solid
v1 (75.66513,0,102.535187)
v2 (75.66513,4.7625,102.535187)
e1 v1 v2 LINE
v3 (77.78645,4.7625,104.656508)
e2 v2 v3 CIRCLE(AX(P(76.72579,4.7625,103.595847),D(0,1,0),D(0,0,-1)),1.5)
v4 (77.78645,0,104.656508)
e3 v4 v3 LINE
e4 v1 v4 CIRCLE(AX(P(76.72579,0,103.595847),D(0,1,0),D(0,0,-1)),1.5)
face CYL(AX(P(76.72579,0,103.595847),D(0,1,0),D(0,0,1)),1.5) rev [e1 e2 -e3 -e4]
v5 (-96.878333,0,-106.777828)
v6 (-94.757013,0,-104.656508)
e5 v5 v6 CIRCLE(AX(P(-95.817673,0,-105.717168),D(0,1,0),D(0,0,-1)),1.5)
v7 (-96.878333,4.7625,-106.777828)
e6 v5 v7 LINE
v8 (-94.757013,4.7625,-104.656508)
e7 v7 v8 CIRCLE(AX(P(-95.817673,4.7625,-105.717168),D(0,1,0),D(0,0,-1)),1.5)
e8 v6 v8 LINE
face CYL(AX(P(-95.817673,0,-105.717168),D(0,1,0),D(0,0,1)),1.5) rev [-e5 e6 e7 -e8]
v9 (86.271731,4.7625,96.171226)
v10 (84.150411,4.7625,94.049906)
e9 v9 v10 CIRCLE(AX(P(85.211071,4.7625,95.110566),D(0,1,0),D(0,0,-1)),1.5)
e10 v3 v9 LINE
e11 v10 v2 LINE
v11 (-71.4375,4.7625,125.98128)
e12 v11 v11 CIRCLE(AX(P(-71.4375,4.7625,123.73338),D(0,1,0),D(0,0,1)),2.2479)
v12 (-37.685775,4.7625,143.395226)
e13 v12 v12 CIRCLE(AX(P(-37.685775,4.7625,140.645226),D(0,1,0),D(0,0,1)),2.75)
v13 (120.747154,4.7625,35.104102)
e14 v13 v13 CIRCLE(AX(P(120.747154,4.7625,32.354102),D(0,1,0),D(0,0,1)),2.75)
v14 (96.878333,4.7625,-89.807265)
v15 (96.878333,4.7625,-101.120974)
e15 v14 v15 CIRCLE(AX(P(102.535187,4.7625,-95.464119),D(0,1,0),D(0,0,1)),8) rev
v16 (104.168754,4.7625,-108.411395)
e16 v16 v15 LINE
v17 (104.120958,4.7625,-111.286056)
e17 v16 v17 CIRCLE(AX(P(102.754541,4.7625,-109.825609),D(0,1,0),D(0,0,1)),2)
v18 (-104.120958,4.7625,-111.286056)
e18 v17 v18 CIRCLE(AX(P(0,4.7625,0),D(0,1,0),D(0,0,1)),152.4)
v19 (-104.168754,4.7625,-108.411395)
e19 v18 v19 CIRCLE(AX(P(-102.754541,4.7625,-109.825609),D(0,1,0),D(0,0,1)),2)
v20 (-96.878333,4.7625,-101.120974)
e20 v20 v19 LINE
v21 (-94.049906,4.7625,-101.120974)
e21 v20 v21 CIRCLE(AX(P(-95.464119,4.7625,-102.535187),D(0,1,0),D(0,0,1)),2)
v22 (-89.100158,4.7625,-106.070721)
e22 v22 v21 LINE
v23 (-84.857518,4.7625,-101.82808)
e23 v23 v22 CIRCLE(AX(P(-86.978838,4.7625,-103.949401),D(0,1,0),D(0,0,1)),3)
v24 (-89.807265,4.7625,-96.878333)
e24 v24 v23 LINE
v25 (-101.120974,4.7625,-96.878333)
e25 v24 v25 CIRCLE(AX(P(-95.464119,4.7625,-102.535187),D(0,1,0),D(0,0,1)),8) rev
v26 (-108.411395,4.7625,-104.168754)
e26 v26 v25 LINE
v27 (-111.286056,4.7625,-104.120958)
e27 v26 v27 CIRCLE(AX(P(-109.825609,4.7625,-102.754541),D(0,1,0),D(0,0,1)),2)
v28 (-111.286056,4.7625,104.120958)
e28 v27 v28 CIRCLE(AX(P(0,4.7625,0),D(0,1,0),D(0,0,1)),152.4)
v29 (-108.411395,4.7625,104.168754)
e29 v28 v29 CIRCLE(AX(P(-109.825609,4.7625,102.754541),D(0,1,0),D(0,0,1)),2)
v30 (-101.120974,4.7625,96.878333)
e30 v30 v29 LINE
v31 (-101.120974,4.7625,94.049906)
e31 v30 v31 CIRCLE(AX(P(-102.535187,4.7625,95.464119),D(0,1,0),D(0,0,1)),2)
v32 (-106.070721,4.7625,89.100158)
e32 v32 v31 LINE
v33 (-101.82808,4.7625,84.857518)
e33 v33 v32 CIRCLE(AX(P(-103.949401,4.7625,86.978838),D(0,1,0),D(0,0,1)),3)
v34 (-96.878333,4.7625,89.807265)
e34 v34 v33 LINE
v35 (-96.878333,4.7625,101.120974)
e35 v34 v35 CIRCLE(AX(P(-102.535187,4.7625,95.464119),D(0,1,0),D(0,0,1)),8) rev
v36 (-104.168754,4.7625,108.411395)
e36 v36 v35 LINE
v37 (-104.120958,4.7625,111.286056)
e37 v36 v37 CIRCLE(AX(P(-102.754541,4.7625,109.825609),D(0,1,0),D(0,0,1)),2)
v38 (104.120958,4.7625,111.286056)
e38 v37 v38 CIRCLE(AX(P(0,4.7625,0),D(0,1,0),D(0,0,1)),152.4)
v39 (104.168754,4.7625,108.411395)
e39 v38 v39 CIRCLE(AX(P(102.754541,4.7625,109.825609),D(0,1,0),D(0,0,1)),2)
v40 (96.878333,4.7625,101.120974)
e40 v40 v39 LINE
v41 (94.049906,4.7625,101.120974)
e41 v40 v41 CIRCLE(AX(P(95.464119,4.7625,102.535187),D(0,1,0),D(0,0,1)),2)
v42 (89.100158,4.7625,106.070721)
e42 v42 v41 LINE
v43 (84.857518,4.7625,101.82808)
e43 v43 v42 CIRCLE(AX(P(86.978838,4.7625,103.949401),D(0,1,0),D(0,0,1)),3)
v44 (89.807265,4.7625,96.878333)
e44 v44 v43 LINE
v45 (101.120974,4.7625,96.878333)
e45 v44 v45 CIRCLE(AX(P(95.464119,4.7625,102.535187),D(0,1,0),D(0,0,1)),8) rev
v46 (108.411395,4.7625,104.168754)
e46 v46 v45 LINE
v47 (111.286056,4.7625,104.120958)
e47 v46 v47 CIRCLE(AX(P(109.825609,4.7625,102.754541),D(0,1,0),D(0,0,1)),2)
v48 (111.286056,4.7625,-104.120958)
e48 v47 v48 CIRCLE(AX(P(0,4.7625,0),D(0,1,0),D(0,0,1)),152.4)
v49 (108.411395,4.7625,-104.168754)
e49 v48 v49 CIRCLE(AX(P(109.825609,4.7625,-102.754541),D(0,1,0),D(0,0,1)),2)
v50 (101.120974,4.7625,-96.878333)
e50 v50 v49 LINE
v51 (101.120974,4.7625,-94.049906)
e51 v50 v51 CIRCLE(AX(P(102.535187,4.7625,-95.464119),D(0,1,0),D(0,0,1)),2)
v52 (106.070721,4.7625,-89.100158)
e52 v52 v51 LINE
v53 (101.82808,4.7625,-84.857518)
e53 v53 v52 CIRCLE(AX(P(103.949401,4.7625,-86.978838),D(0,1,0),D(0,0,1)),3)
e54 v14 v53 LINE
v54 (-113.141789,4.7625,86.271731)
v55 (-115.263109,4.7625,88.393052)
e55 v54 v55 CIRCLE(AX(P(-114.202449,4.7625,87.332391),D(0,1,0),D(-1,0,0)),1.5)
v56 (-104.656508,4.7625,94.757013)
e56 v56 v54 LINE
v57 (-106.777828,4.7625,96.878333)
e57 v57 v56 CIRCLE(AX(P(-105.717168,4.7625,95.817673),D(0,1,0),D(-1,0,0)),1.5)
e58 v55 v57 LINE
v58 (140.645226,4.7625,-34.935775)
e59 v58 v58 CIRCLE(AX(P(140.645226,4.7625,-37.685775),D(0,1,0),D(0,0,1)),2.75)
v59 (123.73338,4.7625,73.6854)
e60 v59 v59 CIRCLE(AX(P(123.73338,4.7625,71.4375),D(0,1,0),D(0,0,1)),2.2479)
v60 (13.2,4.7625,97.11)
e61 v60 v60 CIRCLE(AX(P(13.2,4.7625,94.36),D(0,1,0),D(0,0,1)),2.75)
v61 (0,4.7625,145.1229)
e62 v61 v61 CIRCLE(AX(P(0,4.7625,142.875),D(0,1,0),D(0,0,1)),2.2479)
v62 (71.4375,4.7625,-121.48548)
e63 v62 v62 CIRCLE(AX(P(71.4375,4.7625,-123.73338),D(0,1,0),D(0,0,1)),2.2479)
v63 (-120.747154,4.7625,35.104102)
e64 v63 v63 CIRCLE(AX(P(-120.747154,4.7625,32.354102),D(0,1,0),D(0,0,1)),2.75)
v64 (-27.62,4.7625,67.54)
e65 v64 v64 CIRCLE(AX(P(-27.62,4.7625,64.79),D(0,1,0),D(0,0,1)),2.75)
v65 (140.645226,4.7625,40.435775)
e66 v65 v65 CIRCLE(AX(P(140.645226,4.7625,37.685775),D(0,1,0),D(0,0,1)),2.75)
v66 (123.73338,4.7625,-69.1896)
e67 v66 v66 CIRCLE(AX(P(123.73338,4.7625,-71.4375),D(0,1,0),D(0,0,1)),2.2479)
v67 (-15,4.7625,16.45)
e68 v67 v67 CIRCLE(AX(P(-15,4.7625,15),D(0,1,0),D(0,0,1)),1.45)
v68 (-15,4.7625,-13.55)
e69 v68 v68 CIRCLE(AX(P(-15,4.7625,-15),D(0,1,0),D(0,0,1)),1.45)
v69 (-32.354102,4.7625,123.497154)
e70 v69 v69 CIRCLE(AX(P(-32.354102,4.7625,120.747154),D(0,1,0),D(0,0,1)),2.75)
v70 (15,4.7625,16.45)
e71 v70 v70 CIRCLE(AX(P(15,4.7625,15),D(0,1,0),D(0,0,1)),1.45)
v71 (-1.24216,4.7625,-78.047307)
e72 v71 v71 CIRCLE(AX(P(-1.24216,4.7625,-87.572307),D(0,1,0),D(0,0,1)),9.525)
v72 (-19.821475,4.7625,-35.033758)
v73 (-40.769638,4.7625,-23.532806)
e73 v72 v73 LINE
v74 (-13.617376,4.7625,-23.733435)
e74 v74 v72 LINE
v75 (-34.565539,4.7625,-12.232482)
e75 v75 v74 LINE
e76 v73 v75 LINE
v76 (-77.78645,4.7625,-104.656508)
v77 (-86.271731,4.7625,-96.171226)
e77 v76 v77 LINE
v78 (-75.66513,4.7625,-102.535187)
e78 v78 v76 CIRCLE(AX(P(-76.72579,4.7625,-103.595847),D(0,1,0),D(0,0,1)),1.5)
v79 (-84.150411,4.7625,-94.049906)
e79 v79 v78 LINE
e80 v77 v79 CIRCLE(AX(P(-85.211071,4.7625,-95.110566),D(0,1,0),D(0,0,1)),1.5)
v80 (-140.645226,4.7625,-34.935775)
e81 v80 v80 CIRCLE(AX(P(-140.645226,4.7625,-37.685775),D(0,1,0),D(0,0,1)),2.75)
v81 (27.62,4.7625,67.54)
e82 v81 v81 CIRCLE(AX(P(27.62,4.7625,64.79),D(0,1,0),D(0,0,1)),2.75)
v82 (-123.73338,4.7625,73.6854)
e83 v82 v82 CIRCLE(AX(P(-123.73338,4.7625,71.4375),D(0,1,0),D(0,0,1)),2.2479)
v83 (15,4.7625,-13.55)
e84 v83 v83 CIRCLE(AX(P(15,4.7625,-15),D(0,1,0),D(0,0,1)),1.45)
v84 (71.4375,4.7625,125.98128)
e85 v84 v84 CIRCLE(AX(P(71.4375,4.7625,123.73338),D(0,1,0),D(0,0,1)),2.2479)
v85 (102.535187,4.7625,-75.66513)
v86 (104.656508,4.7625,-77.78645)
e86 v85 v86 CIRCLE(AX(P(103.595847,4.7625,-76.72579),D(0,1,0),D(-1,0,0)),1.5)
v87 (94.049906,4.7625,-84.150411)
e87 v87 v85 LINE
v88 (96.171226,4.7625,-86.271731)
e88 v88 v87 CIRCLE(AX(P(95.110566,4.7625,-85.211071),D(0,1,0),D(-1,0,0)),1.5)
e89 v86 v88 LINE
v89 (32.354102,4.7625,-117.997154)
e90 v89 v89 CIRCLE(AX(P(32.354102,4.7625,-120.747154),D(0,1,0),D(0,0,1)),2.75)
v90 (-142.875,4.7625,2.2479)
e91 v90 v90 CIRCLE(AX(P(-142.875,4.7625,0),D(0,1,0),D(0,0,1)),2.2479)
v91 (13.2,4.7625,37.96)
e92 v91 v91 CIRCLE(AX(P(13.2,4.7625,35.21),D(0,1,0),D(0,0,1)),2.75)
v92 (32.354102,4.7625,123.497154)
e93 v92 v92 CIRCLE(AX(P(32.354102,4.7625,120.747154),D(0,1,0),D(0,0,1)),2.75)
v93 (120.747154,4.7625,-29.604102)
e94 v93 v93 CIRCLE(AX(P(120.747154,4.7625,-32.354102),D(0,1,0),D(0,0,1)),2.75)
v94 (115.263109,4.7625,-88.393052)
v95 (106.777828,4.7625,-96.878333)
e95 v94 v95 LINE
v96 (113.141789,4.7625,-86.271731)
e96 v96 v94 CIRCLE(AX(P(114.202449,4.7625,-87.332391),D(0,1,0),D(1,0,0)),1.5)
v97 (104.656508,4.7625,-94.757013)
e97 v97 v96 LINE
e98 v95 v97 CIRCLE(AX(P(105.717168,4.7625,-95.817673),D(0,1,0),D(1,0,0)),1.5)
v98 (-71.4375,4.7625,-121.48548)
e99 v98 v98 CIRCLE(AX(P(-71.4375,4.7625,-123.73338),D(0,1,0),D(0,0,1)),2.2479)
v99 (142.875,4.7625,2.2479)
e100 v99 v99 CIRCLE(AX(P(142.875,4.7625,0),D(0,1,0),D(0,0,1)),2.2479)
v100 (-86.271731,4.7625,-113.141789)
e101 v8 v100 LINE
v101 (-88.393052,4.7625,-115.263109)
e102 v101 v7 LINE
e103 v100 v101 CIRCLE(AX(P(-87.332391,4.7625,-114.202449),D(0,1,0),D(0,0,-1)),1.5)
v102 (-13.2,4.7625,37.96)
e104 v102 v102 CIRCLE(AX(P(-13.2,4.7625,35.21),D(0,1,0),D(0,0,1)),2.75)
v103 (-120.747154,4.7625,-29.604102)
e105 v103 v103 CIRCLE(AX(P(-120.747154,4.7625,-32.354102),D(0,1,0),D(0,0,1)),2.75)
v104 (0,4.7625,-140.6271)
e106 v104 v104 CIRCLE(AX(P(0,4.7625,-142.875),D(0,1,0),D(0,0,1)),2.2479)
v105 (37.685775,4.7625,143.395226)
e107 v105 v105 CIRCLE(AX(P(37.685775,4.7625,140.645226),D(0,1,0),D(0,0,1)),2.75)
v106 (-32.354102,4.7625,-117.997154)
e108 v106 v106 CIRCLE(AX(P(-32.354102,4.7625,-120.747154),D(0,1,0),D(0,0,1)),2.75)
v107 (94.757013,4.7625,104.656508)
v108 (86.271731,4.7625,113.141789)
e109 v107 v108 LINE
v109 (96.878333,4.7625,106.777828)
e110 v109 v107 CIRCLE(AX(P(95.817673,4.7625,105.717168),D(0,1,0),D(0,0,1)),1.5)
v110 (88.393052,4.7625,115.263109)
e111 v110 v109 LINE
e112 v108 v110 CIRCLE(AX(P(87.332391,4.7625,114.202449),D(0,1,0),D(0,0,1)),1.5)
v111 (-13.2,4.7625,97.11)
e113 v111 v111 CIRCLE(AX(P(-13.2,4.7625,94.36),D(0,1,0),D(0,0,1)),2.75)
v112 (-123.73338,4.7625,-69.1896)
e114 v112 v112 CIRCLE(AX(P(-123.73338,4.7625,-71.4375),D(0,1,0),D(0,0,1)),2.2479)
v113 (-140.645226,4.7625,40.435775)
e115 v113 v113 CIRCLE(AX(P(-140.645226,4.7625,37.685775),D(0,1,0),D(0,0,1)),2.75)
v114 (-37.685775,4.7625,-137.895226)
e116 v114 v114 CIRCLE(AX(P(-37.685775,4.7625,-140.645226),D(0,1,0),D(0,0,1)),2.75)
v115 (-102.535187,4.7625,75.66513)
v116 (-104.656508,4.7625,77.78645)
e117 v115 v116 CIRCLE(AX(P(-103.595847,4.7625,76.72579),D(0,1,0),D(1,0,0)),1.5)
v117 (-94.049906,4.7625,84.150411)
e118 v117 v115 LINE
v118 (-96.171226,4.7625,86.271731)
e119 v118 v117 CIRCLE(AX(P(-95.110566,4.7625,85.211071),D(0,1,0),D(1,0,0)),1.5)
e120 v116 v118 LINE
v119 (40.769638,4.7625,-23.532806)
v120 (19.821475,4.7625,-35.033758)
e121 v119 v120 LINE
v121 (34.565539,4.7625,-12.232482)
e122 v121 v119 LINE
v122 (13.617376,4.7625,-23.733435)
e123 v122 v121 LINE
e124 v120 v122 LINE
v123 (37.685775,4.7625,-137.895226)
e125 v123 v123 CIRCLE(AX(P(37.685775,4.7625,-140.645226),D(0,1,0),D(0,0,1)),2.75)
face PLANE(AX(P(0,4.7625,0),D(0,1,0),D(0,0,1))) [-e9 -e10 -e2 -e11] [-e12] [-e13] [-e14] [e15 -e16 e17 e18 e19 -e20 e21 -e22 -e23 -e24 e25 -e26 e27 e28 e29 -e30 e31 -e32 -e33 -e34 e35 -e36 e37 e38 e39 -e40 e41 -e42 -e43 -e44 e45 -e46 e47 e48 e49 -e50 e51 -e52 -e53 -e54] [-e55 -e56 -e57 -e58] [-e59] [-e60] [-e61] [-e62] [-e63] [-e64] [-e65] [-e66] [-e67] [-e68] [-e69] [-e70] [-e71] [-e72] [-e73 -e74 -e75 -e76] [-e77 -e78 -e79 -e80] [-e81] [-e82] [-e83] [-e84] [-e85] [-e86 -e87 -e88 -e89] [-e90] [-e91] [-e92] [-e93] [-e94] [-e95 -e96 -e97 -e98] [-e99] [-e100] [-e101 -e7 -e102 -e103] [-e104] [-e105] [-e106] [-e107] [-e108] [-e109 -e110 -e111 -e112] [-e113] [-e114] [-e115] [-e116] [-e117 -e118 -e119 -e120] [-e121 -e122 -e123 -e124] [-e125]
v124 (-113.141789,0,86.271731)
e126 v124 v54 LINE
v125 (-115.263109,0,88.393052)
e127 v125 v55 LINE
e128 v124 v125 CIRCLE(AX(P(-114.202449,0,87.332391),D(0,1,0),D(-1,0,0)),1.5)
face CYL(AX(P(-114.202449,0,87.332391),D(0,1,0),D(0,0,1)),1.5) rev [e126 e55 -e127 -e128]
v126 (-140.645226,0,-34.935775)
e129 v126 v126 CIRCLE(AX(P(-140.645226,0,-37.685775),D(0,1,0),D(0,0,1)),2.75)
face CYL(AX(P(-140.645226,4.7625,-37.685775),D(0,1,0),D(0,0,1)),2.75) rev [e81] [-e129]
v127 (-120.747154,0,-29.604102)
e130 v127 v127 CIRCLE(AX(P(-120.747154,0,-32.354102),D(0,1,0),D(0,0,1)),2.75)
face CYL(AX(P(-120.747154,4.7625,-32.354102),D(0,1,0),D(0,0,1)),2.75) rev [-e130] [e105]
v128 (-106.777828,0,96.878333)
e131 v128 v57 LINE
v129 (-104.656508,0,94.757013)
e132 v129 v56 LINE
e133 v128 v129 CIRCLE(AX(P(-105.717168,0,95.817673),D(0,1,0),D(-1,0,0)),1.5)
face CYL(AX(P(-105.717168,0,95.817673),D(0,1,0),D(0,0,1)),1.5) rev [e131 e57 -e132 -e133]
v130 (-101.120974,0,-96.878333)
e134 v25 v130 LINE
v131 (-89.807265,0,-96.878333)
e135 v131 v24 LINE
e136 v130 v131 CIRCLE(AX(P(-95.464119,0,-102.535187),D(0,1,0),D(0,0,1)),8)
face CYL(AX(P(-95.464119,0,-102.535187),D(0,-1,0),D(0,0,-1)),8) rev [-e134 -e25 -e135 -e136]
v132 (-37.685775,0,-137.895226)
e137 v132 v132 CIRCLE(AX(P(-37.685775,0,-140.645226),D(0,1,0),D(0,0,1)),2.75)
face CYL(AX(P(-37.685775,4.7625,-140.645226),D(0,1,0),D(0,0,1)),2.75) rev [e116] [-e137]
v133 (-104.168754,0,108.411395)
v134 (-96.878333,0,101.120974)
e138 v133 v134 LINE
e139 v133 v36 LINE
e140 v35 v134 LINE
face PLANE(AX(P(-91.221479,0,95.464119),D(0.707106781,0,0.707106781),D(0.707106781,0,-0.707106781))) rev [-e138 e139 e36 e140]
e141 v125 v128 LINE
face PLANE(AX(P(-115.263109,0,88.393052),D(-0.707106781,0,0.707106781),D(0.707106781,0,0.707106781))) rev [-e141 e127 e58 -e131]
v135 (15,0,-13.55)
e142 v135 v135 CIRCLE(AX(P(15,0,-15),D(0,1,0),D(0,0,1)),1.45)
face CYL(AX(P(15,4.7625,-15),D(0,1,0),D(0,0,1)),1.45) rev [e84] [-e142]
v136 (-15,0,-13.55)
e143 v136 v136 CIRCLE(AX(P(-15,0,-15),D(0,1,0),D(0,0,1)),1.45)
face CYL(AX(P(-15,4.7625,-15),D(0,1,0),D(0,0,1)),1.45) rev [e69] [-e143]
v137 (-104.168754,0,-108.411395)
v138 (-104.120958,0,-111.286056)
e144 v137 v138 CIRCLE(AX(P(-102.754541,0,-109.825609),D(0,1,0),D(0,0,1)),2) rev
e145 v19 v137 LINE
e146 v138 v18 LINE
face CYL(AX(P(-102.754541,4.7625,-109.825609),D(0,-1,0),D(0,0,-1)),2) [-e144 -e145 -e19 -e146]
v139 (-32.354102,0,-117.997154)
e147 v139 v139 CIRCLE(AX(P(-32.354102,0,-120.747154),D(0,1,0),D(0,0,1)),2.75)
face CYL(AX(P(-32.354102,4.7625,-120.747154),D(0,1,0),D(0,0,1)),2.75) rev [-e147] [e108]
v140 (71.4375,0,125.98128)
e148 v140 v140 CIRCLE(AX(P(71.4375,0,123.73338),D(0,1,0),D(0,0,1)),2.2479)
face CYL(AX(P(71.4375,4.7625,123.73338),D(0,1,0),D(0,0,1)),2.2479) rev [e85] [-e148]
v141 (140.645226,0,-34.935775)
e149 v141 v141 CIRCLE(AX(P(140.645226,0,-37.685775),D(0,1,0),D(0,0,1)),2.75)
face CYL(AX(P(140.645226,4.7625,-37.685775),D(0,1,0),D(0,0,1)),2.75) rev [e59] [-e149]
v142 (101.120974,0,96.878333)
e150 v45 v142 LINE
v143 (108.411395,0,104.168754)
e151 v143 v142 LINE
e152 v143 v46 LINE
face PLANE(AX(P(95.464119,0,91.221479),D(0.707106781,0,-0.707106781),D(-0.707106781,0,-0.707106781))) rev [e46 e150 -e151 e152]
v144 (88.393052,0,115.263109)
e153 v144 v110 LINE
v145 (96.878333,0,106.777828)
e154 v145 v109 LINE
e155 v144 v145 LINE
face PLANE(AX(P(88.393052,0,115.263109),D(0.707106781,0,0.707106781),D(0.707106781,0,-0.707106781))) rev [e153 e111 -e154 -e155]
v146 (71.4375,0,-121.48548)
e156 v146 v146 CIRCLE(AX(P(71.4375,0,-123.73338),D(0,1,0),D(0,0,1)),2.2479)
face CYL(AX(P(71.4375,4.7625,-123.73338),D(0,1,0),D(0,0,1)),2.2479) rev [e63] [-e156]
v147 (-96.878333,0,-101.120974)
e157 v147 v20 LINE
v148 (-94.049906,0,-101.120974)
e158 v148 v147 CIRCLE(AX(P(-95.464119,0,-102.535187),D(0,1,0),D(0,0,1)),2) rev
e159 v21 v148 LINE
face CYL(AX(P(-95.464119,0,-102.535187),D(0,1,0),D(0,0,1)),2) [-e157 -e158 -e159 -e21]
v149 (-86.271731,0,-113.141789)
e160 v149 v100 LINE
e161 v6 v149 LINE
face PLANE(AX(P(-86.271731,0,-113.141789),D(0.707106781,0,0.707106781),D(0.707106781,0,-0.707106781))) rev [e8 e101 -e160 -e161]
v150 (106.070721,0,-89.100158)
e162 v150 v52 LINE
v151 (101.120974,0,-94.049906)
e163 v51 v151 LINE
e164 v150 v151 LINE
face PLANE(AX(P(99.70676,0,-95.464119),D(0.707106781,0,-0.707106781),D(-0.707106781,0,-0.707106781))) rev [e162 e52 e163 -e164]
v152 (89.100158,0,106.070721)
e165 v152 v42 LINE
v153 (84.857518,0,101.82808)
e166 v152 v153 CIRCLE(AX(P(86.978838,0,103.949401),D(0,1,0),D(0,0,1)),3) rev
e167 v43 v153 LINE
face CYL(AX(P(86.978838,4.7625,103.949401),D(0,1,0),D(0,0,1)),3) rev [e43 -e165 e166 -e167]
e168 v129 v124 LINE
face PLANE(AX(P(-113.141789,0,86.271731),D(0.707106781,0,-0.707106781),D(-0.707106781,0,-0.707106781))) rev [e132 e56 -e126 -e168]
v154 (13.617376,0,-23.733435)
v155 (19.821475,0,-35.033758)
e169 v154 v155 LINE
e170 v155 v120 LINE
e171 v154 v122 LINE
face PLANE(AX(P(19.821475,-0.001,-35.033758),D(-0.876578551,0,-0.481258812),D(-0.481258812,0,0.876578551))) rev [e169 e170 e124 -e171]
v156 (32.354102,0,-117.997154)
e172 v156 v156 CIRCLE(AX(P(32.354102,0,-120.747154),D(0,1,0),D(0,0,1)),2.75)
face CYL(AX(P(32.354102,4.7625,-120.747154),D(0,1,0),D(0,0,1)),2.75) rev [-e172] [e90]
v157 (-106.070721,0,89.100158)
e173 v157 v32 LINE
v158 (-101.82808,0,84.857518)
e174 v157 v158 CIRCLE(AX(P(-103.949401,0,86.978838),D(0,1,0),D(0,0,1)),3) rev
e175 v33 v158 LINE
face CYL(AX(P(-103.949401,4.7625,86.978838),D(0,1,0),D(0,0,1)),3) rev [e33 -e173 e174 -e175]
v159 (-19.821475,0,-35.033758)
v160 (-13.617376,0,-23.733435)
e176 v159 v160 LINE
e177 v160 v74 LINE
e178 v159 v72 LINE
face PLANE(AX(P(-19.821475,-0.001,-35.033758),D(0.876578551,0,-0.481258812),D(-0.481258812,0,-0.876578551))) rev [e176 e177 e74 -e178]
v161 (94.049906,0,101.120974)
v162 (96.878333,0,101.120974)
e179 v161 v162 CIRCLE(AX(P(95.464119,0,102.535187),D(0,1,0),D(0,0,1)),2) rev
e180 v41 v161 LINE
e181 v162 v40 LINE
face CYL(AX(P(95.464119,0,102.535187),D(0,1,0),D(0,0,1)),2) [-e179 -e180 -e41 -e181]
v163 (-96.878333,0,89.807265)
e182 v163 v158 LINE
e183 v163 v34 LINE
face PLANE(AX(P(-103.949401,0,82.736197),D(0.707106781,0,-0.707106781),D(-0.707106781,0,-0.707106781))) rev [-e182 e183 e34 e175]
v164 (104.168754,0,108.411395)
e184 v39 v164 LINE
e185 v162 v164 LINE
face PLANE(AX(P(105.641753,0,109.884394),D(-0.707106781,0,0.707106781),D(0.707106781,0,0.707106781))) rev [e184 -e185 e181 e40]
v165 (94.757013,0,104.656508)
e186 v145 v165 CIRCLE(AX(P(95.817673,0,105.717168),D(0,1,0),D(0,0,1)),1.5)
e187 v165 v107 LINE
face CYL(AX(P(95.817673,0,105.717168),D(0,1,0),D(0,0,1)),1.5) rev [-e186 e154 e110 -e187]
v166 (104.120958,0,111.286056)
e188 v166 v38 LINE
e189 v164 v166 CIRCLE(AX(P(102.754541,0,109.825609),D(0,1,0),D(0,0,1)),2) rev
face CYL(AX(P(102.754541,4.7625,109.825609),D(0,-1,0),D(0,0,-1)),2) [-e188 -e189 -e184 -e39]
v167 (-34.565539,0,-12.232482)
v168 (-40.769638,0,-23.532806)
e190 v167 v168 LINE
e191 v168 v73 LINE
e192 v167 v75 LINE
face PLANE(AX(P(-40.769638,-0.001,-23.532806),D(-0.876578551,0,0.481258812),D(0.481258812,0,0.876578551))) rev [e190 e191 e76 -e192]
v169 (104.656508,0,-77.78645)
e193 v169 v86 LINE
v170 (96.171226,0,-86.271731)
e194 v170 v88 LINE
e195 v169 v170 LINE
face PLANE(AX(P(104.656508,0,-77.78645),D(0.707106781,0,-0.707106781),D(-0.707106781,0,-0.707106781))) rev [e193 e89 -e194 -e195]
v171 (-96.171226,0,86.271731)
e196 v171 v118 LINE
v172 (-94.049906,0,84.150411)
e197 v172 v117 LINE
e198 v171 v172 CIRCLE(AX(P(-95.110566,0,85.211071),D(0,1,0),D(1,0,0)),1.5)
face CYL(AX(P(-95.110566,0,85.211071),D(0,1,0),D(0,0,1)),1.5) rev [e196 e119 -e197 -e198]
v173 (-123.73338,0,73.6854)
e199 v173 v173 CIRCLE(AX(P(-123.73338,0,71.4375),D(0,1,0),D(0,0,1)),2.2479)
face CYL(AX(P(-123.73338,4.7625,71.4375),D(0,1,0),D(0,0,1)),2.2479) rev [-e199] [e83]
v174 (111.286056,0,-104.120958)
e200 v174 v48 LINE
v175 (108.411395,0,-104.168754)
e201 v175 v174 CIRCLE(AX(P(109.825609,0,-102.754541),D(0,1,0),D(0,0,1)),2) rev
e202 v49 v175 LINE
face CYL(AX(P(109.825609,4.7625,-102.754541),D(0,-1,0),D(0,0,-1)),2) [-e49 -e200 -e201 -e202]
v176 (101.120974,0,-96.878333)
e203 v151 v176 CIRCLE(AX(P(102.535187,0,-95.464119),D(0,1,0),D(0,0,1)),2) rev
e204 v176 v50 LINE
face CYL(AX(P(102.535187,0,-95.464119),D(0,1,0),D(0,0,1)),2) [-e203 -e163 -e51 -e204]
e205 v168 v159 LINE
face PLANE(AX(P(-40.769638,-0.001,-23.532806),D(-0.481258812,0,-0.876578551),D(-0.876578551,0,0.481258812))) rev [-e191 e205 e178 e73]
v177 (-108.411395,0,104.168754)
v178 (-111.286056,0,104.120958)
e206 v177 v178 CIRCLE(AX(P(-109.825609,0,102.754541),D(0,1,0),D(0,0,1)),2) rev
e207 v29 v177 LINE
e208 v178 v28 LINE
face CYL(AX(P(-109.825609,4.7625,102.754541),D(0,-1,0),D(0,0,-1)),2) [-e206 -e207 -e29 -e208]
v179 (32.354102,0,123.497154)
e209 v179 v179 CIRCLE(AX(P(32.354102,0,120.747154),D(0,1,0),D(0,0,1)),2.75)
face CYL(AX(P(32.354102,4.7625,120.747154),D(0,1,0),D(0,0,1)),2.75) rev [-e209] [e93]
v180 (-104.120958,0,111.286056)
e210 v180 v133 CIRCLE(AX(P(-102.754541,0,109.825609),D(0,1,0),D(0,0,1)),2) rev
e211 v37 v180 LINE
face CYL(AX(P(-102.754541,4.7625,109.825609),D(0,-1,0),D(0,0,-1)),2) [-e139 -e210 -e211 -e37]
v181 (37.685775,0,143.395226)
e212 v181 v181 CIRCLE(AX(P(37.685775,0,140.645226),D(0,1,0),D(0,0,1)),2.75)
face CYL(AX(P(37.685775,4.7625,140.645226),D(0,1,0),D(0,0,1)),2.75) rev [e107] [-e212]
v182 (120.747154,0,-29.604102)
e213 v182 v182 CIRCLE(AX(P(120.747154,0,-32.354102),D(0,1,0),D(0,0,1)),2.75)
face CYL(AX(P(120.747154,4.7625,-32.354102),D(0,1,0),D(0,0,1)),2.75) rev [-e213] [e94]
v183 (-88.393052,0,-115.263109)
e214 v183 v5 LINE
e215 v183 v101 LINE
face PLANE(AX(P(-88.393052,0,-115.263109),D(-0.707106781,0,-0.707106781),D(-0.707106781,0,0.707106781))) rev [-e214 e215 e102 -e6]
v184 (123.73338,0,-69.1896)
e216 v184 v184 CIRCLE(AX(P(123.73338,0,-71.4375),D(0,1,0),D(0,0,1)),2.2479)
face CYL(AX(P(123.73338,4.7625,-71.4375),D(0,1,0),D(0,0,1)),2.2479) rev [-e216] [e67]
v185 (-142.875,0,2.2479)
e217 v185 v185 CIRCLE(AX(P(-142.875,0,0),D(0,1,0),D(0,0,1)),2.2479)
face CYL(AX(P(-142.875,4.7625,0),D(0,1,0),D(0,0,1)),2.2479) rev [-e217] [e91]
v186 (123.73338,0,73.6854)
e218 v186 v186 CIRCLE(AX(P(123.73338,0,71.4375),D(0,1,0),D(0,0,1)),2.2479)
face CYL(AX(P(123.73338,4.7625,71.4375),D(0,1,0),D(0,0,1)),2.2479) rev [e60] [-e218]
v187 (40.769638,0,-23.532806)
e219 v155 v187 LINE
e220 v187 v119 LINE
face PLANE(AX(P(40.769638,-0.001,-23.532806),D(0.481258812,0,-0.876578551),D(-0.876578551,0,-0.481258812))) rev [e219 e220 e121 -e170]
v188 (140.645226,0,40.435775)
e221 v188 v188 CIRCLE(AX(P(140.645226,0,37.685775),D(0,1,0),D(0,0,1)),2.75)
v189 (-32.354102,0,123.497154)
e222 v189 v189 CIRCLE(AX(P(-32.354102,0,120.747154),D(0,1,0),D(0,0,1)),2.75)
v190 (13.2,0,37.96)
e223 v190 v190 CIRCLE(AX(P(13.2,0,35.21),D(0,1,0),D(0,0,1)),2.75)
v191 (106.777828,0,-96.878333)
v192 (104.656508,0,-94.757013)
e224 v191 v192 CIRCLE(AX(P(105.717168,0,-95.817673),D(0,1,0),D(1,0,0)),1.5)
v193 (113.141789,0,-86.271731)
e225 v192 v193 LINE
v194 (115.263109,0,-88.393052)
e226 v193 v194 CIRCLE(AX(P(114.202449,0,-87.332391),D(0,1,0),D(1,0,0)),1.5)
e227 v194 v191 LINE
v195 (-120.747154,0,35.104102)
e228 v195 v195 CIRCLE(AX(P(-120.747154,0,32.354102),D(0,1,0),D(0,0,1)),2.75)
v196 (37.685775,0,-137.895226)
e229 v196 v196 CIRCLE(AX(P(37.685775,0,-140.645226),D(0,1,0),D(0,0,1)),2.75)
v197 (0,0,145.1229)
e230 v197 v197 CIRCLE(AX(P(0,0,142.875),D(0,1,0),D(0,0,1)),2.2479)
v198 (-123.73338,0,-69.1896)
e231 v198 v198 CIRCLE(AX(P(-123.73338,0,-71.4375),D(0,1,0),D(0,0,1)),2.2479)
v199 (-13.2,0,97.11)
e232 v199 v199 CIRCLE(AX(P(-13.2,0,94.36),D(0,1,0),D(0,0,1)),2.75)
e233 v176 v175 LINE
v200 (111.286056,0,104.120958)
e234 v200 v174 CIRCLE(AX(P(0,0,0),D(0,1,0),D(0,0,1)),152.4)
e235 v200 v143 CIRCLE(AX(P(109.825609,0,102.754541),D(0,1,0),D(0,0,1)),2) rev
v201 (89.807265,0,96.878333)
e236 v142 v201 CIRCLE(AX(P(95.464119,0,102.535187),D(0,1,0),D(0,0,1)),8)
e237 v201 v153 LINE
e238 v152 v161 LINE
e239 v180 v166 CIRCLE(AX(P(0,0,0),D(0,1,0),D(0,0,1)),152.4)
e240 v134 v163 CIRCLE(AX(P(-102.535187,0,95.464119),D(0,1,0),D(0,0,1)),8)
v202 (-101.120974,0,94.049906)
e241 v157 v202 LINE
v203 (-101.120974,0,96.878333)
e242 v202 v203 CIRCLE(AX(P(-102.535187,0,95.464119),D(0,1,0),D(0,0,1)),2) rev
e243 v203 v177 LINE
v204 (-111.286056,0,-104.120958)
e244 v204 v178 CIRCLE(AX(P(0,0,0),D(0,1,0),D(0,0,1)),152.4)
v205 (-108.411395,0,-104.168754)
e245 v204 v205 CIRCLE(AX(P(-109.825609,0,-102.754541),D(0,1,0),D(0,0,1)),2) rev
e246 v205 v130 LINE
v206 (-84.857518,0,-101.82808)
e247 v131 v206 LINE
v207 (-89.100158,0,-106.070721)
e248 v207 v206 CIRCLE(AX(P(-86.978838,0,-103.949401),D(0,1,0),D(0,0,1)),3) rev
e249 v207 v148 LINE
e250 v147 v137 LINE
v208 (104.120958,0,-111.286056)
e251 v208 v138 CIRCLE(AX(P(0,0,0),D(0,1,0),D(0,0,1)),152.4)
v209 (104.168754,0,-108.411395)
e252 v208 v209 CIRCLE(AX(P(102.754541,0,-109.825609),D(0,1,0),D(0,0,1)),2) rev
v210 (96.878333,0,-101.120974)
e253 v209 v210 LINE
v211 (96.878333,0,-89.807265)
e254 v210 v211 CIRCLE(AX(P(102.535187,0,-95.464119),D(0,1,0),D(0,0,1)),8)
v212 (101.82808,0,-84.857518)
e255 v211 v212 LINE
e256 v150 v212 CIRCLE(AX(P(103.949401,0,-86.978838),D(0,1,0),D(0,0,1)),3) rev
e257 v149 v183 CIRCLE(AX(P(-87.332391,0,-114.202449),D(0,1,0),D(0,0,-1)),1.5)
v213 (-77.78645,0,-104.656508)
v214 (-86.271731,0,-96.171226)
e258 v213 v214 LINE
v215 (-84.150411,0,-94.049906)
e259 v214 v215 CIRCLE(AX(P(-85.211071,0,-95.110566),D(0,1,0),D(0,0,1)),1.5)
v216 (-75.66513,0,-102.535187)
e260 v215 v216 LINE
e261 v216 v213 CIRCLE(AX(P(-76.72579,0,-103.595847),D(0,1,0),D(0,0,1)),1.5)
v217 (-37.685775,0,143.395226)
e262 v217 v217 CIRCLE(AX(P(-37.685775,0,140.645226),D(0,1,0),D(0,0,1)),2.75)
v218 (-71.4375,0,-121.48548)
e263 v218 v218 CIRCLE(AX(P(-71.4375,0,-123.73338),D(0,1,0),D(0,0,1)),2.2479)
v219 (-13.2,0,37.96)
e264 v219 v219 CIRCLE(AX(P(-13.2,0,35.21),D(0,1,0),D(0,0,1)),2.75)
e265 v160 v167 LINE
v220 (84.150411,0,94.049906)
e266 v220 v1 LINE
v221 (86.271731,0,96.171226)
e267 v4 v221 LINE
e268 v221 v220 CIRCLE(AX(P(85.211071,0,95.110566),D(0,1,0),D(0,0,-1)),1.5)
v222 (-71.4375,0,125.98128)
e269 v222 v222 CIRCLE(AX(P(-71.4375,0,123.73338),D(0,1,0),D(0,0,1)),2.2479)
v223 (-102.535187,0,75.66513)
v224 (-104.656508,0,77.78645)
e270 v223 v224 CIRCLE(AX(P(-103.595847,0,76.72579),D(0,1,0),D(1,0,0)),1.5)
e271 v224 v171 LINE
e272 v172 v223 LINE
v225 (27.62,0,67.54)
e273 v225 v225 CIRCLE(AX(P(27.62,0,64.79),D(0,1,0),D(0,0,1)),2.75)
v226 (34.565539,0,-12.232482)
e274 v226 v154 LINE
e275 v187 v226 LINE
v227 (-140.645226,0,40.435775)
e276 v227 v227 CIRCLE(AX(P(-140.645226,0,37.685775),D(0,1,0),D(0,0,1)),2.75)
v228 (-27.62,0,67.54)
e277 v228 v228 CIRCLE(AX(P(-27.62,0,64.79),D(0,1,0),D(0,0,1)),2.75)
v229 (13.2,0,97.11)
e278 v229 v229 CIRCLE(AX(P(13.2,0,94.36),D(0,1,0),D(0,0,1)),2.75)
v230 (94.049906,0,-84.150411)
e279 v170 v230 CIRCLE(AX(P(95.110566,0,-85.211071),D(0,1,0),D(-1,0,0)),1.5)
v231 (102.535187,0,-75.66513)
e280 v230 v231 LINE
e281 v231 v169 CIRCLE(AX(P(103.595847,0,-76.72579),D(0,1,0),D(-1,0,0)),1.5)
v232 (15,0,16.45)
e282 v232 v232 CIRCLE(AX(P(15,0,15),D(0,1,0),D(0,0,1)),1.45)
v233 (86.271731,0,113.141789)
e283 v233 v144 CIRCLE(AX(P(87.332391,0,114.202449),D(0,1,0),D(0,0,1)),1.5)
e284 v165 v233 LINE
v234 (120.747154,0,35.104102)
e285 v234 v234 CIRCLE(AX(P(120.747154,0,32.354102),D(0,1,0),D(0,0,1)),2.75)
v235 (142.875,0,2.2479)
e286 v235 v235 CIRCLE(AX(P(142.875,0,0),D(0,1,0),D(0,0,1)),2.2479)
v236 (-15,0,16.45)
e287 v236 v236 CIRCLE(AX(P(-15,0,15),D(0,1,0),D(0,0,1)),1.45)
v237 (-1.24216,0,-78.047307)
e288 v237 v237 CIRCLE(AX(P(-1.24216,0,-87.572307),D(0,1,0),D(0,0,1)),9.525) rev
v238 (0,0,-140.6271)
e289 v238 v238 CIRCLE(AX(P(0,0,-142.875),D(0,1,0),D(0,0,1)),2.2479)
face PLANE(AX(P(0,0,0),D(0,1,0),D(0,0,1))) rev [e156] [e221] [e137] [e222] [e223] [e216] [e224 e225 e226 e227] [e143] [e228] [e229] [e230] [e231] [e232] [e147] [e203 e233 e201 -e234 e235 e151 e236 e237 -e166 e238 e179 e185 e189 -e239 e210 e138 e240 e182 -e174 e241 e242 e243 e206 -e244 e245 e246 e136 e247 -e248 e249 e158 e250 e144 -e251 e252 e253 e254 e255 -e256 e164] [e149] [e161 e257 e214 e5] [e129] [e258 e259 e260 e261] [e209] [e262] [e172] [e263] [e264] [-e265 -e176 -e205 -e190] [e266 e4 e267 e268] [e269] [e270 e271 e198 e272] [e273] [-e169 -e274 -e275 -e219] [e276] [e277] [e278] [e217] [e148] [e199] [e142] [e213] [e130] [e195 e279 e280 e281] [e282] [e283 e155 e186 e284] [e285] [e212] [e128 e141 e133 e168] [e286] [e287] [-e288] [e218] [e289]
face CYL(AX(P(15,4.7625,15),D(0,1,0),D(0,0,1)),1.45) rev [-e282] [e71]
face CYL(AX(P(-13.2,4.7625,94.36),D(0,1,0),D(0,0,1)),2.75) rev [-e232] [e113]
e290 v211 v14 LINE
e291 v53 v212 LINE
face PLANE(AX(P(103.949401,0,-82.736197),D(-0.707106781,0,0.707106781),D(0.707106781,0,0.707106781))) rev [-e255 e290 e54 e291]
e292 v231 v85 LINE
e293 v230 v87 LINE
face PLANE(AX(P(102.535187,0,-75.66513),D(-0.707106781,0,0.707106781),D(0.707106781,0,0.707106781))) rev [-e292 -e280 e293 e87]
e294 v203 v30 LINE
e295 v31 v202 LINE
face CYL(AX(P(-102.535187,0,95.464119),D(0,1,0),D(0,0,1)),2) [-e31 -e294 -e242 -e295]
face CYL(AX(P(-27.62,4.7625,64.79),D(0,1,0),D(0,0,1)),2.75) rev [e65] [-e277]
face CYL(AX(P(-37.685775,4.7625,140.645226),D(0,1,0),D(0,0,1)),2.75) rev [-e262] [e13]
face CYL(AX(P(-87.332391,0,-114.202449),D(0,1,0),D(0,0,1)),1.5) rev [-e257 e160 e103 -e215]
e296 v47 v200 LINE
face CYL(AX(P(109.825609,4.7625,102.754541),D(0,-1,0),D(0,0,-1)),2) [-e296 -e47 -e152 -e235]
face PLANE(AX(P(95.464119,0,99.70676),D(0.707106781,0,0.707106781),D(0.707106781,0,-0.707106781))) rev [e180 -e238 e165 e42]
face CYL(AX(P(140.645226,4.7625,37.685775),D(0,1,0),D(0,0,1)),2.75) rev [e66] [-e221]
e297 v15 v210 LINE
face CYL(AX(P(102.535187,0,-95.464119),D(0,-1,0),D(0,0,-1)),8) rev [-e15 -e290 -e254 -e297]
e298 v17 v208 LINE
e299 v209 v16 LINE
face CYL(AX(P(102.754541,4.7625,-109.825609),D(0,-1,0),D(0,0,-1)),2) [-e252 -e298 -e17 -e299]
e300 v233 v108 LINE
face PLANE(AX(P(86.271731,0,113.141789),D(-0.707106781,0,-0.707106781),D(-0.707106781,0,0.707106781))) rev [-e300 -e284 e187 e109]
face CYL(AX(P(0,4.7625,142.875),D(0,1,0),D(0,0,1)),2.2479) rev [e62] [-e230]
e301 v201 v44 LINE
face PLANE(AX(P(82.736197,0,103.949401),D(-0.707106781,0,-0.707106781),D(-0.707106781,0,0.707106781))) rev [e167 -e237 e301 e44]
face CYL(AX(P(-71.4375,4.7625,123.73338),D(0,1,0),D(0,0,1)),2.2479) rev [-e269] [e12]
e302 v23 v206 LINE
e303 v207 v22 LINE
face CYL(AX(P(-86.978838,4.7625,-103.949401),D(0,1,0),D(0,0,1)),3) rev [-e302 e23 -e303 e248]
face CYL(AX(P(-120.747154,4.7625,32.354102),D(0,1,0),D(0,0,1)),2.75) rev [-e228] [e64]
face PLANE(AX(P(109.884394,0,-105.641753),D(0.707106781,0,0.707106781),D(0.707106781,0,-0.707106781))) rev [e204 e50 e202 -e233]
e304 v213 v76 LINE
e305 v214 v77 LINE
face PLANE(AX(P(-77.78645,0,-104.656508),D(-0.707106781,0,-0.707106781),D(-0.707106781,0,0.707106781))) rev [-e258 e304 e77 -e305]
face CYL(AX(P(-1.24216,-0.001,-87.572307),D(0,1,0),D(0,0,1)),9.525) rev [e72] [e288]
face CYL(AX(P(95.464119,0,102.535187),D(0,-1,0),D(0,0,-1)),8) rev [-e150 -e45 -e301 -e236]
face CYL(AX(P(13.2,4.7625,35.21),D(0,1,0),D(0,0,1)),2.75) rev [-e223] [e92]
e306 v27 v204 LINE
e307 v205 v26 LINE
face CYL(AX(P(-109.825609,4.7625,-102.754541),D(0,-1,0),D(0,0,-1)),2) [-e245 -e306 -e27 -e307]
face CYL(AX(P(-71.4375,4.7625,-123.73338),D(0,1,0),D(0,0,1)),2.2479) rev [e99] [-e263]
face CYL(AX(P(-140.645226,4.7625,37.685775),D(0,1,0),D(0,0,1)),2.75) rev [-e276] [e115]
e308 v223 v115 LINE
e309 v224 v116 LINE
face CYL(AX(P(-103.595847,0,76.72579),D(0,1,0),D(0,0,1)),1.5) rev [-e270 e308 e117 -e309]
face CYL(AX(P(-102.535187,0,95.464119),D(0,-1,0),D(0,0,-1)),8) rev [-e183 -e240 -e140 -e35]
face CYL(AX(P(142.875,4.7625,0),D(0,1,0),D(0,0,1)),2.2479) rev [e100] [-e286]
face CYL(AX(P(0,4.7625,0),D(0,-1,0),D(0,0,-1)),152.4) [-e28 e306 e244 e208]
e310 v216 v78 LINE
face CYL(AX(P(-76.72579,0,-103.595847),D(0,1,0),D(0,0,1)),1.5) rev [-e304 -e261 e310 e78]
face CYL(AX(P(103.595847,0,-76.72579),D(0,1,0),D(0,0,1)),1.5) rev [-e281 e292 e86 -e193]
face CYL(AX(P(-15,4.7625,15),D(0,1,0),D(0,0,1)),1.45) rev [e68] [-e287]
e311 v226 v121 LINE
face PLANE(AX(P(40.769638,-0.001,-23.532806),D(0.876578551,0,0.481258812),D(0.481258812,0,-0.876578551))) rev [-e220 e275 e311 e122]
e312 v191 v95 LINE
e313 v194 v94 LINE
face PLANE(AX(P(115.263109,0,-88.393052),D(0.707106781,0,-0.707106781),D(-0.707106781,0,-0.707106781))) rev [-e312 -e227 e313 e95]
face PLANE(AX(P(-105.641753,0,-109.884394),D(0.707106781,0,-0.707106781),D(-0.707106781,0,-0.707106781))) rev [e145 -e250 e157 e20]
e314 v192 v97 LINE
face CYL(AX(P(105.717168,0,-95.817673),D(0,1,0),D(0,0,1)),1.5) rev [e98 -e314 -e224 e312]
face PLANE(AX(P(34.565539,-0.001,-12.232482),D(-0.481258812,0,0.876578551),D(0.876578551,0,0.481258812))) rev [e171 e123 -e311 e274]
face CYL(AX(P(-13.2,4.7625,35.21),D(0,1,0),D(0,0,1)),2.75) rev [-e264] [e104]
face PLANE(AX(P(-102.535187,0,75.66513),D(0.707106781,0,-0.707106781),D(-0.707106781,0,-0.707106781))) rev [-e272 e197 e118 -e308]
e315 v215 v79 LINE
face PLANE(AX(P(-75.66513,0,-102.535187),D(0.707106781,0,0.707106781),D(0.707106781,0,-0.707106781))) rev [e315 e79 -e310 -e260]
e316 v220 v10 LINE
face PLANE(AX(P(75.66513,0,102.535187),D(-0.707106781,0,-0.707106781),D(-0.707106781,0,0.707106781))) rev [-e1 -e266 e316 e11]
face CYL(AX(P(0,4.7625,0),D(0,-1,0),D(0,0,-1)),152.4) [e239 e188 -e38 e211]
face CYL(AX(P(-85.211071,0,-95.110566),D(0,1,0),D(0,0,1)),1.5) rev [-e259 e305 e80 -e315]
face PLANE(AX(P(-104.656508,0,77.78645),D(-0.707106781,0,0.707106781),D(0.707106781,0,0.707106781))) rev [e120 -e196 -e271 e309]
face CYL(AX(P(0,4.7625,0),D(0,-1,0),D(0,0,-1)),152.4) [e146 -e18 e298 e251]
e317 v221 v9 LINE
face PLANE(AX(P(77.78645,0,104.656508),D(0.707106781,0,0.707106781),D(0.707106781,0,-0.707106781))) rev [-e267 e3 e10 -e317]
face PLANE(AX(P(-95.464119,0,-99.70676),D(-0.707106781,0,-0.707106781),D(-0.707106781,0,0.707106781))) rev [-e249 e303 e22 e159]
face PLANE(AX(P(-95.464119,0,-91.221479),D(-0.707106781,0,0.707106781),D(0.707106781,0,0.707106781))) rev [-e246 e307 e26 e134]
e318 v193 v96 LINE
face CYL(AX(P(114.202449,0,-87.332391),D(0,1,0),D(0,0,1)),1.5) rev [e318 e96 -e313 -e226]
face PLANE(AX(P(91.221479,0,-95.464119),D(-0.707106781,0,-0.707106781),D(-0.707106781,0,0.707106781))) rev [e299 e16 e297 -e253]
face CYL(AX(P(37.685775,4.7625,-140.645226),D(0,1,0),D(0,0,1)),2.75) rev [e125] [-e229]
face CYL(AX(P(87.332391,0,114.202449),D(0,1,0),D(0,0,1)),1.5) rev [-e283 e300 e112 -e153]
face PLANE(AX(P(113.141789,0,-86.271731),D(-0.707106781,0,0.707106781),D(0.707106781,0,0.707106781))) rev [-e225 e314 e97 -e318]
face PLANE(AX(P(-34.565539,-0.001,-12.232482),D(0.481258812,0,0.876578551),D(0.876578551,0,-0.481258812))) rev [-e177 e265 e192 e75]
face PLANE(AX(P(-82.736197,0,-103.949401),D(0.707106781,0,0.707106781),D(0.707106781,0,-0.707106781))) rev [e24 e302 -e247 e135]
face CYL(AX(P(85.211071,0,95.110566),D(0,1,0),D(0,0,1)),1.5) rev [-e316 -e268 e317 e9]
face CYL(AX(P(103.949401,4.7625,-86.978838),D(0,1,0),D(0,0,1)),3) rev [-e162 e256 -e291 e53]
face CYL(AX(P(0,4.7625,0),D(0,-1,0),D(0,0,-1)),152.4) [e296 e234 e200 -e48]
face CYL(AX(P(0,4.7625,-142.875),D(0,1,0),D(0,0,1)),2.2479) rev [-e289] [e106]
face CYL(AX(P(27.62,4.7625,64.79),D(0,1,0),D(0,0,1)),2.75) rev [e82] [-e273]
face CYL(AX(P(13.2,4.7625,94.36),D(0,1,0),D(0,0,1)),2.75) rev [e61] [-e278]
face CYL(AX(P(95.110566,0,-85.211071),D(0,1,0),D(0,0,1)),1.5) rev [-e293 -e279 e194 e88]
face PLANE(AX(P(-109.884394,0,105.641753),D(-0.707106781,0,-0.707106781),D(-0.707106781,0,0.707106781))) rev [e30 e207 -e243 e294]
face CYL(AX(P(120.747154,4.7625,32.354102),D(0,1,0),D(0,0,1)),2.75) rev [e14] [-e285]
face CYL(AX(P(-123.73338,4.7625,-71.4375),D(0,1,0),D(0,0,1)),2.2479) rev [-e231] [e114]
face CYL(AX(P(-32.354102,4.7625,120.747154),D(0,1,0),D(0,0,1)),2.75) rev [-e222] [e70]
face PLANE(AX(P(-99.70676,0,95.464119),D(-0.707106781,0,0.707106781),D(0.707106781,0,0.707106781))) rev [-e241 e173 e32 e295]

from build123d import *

# Parameters (mm, degrees)
SKETCH1_R                = 152.4
BOSS_EXTRUDE1_DEPTH      = 4.7625
F_8_CLEARANCE_HOLE1_D    = 4.4958
CIRPATTERN1_COUNT        = 12
M2_5_CLEARANCE_HOLE1_D   = 2.9
CUT_EXTRUDE1_DEPTH       = 216.578759172
FILLET1_R                = 3
FILLET2_R                = 2
FILLET3_R                = 8
CIRPATTERN2_COUNT        = 4
FILLET1_OF_CIRPATTERN2_R = 3
FILLET2_OF_CIRPATTERN2_R = 2
FILLET3_OF_CIRPATTERN2_R = 8
M5_CLEARANCE_HOLE1_D     = 5.5
M5_CLEARANCE_HOLE2_D     = 5.5
CIRPATTERN3_COUNT        = 12
CUT_EXTRUDE3_REACH       = 217.579
SKETCH15_R               = 9.525
CUT_EXTRUDE4_REACH       = 217.579


with BuildPart() as part:
    # Sketch1 → Boss-Extrude1 (new body)
    with BuildSketch(Plane(origin=(0, 0, 0), x_dir=(1, 0, 0), z_dir=(0, 1, 0))):
        with Locations(Location((0, 0, 0), (0, 0, 90))):
            Circle(SKETCH1_R)
    extrude(amount=BOSS_EXTRUDE1_DEPTH)

    # #8 Clearance Hole1 (through all)
    with Locations(Plane(origin=(0, 4.7625, 0), x_dir=(1, 0, 0), z_dir=(0, 1, 0))):
        with Locations((0, -142.875)):
            f_8_clearance_hole1 = Hole(F_8_CLEARANCE_HOLE1_D / 2)

    # CirPattern1: #8 Clearance Hole1 ×12 about axis
    cirpattern1_axis = Axis((0, 0, 0), (0, 1, 0))
    for i in range(1, CIRPATTERN1_COUNT):
        add(f_8_clearance_hole1.rotate(cirpattern1_axis, i * 360 / CIRPATTERN1_COUNT), mode=Mode.SUBTRACT)

    # M2.5 Clearance Hole1 (through all)
    with Locations(Plane(origin=(0, 4.7625, 0), x_dir=(1, 0, 0), z_dir=(0, 1, 0))):
        with Locations((-15, -15), (-15, 15), (15, 15), (15, -15)):
            Hole(M2_5_CLEARANCE_HOLE1_D / 2)

    # Sketch8 → Cut-Extrude1 (cut, through all)
    with BuildSketch(Plane(origin=(0, 4.7625, 0), x_dir=(1, 0, 0), z_dir=(0, 1, 0))):
        Polygon((105.641753109, -109.884393796), (95.464119439, -99.706760126), (86.978838065, -108.192041501), (82.736197378, -103.949400814), (95.464119439, -91.221478752), (109.884393796, -105.641753109), align=None)
        with BuildLine():
            Line((86.271731284, -113.141788969), (94.757012658, -104.656507595))
            ThreePointArc((94.757012658, -104.656507595), (96.878333002, -104.656507595), (96.878333002, -106.777827938))
            Line((96.878333002, -106.777827938), (88.393051627, -115.263109313))
            ThreePointArc((88.393051627, -115.263109313), (86.271731284, -115.263109313), (86.271731284, -113.141788969))
        make_face()
        with BuildLine():
            Line((77.78644991, -104.656507595), (86.271731284, -96.17122622))
            ThreePointArc((86.271731284, -96.17122622), (86.271731284, -94.049905877), (84.15041094, -94.049905877))
            Line((84.15041094, -94.049905877), (75.665129566, -102.535187251))
            ThreePointArc((75.665129566, -102.535187251), (75.665129566, -104.656507595), (77.78644991, -104.656507595))
        make_face()
    cut_extrude1 = extrude(amount=-CUT_EXTRUDE1_DEPTH, mode=Mode.SUBTRACT)

    # Fillet1
    fillet1_edges = [part.edges().sort_by_distance(p)[0] for p in [
        (86.978838065, 2.38125, 108.192041501),
        (82.736197378, 2.38125, 103.949400814),
    ]]
    fillet(fillet1_edges, radius=FILLET1_R - 0.0001)  # a hair under: the kernel refuses the full size

    # Fillet2
    fillet2_edges = [part.edges().sort_by_distance(p)[0] for p in [
        (105.620871949, 2.38125, 109.863512636),
        (109.863512636, 2.38125, 105.620871949),
        (95.464119439, 2.38125, 99.706760126),
    ]]
    fillet(fillet2_edges, radius=FILLET2_R)

    # Fillet3
    fillet3_edges = [part.edges().sort_by_distance(p)[0] for p in [
        (95.464119439, 2.38125, 91.221478752),
    ]]
    fillet(fillet3_edges, radius=FILLET3_R)

    # CirPattern2: Cut-Extrude1 ×4 about axis
    cirpattern2_axis = Axis((0, 0, 0), (0, 1, 0))
    for i in range(1, CIRPATTERN2_COUNT):
        add(cut_extrude1.rotate(cirpattern2_axis, i * 360 / CIRPATTERN2_COUNT), mode=Mode.SUBTRACT)

    # Fillet1 of CirPattern2
    fillet1_of_cirpattern2_edges = [part.edges().sort_by_distance(p)[0] for p in [
        (108.192041501, 2.38125, -86.978838065),
        (103.949400814, 2.38125, -82.736197378),
        (-86.978838065, 2.38125, -108.192041501),
        (-82.736197378, 2.38125, -103.949400814),
        (-108.192041501, 2.38125, 86.978838065),
        (-103.949400814, 2.38125, 82.736197378),
    ]]
    fillet(fillet1_of_cirpattern2_edges, radius=FILLET1_OF_CIRPATTERN2_R - 0.0001)  # a hair under: the kernel refuses the full size

    # Fillet2 of CirPattern2
    fillet2_of_cirpattern2_edges = [part.edges().sort_by_distance(p)[0] for p in [
        (109.863512636, 2.38125, -105.620871949),
        (105.620871949, 2.38125, -109.863512636),
        (99.706760126, 2.38125, -95.464119439),
        (-105.620871949, 2.38125, -109.863512636),
        (-109.863512636, 2.38125, -105.620871949),
        (-95.464119439, 2.38125, -99.706760126),
        (-109.863512636, 2.38125, 105.620871949),
        (-105.620871949, 2.38125, 109.863512636),
        (-99.706760126, 2.38125, 95.464119439),
    ]]
    fillet(fillet2_of_cirpattern2_edges, radius=FILLET2_OF_CIRPATTERN2_R)

    # Fillet3 of CirPattern2
    fillet3_of_cirpattern2_edges = [part.edges().sort_by_distance(p)[0] for p in [
        (91.221478752, 2.38125, -95.464119439),
        (-95.464119439, 2.38125, -91.221478752),
        (-91.221478752, 2.38125, 95.464119439),
    ]]
    fillet(fillet3_of_cirpattern2_edges, radius=FILLET3_OF_CIRPATTERN2_R)

    # M5 Clearance Hole1 (through all)
    with Locations(Plane(origin=(0, 4.7625, 0), x_dir=(1, 0, 0), z_dir=(0, 1, 0))):
        with Locations((-13.2, -35.21), (13.2, -35.21), (27.62, -64.79), (13.2, -94.36), (-13.2, -94.36), (-27.62, -64.79)):
            Hole(M5_CLEARANCE_HOLE1_D / 2)

    # M5 Clearance Hole2 (through all)
    with Locations(Plane(origin=(0, 4.7625, 0), x_dir=(1, 0, 0), z_dir=(0, 1, 0))):
        with Locations((32.354102414, -120.747154041), (37.685774743, -140.645226063)):
            m5_clearance_hole2 = Hole(M5_CLEARANCE_HOLE2_D / 2)

    # CirPattern3: M5 Clearance Hole2 ×12 about axis, 4 skipped
    cirpattern3_axis = Axis((0, 0, 0), (0, -1, 0))
    add([m5_clearance_hole2.rotate(cirpattern3_axis, i * 360 / CIRPATTERN3_COUNT) for i in range(1, CIRPATTERN3_COUNT) if i not in (2, 5, 8, 11)], mode=Mode.SUBTRACT)

    # Sketch15 → Cut-Extrude3 (cut, up to next)
    with BuildSketch(Plane(origin=(0, 4.7625, 0), x_dir=(1, 0, 0), z_dir=(0, 1, 0)), mode=Mode.PRIVATE) as cut_extrude3_sk1:
        with Locations(Location((-1.242160376, 87.572306541, 0), (0, 0, 270))):
            Circle(SKETCH15_R)
    cut_extrude3_tool1 = extrude(cut_extrude3_sk1.sketch, amount=-CUT_EXTRUDE3_REACH, mode=Mode.PRIVATE) & part.part
    add(cut_extrude3_tool1.solids().sort_by_distance((-1.24216, 4.7625, -87.572307))[0], mode=Mode.SUBTRACT)

    # Sketch16 → Cut-Extrude4 (cut, up to next)
    with BuildSketch(Plane(origin=(0, 4.7625, 0), x_dir=(1, 0, 0), z_dir=(0, 1, 0)), mode=Mode.PRIVATE) as cut_extrude4_sk1:
        Polygon((40.769638118, 23.532806086), (34.565538825, 12.232482372), (13.617375959, 23.733434534), (19.821475253, 35.033758247), align=None)
    cut_extrude4_tool1 = extrude(cut_extrude4_sk1.sketch, amount=-CUT_EXTRUDE4_REACH, mode=Mode.PRIVATE) & part.part
    # Sketch16 → Cut-Extrude4 (cut, up to next)
    with BuildSketch(Plane(origin=(0, 4.7625, 0), x_dir=(1, 0, 0), z_dir=(0, 1, 0)), mode=Mode.PRIVATE) as cut_extrude4_sk2:
        Polygon((-19.821475253, 35.033758247), (-13.617375959, 23.733434534), (-34.565538825, 12.232482372), (-40.769638118, 23.532806086), align=None)
    cut_extrude4_tool2 = extrude(cut_extrude4_sk2.sketch, amount=-CUT_EXTRUDE4_REACH, mode=Mode.PRIVATE) & part.part
    add(cut_extrude4_tool1.solids().sort_by_distance((27.193507, 4.7625, -23.63312))[0], mode=Mode.SUBTRACT)
    add(cut_extrude4_tool2.solids().sort_by_distance((-27.193507, 4.7625, -23.63312))[0], mode=Mode.SUBTRACT)


solid = part.part
